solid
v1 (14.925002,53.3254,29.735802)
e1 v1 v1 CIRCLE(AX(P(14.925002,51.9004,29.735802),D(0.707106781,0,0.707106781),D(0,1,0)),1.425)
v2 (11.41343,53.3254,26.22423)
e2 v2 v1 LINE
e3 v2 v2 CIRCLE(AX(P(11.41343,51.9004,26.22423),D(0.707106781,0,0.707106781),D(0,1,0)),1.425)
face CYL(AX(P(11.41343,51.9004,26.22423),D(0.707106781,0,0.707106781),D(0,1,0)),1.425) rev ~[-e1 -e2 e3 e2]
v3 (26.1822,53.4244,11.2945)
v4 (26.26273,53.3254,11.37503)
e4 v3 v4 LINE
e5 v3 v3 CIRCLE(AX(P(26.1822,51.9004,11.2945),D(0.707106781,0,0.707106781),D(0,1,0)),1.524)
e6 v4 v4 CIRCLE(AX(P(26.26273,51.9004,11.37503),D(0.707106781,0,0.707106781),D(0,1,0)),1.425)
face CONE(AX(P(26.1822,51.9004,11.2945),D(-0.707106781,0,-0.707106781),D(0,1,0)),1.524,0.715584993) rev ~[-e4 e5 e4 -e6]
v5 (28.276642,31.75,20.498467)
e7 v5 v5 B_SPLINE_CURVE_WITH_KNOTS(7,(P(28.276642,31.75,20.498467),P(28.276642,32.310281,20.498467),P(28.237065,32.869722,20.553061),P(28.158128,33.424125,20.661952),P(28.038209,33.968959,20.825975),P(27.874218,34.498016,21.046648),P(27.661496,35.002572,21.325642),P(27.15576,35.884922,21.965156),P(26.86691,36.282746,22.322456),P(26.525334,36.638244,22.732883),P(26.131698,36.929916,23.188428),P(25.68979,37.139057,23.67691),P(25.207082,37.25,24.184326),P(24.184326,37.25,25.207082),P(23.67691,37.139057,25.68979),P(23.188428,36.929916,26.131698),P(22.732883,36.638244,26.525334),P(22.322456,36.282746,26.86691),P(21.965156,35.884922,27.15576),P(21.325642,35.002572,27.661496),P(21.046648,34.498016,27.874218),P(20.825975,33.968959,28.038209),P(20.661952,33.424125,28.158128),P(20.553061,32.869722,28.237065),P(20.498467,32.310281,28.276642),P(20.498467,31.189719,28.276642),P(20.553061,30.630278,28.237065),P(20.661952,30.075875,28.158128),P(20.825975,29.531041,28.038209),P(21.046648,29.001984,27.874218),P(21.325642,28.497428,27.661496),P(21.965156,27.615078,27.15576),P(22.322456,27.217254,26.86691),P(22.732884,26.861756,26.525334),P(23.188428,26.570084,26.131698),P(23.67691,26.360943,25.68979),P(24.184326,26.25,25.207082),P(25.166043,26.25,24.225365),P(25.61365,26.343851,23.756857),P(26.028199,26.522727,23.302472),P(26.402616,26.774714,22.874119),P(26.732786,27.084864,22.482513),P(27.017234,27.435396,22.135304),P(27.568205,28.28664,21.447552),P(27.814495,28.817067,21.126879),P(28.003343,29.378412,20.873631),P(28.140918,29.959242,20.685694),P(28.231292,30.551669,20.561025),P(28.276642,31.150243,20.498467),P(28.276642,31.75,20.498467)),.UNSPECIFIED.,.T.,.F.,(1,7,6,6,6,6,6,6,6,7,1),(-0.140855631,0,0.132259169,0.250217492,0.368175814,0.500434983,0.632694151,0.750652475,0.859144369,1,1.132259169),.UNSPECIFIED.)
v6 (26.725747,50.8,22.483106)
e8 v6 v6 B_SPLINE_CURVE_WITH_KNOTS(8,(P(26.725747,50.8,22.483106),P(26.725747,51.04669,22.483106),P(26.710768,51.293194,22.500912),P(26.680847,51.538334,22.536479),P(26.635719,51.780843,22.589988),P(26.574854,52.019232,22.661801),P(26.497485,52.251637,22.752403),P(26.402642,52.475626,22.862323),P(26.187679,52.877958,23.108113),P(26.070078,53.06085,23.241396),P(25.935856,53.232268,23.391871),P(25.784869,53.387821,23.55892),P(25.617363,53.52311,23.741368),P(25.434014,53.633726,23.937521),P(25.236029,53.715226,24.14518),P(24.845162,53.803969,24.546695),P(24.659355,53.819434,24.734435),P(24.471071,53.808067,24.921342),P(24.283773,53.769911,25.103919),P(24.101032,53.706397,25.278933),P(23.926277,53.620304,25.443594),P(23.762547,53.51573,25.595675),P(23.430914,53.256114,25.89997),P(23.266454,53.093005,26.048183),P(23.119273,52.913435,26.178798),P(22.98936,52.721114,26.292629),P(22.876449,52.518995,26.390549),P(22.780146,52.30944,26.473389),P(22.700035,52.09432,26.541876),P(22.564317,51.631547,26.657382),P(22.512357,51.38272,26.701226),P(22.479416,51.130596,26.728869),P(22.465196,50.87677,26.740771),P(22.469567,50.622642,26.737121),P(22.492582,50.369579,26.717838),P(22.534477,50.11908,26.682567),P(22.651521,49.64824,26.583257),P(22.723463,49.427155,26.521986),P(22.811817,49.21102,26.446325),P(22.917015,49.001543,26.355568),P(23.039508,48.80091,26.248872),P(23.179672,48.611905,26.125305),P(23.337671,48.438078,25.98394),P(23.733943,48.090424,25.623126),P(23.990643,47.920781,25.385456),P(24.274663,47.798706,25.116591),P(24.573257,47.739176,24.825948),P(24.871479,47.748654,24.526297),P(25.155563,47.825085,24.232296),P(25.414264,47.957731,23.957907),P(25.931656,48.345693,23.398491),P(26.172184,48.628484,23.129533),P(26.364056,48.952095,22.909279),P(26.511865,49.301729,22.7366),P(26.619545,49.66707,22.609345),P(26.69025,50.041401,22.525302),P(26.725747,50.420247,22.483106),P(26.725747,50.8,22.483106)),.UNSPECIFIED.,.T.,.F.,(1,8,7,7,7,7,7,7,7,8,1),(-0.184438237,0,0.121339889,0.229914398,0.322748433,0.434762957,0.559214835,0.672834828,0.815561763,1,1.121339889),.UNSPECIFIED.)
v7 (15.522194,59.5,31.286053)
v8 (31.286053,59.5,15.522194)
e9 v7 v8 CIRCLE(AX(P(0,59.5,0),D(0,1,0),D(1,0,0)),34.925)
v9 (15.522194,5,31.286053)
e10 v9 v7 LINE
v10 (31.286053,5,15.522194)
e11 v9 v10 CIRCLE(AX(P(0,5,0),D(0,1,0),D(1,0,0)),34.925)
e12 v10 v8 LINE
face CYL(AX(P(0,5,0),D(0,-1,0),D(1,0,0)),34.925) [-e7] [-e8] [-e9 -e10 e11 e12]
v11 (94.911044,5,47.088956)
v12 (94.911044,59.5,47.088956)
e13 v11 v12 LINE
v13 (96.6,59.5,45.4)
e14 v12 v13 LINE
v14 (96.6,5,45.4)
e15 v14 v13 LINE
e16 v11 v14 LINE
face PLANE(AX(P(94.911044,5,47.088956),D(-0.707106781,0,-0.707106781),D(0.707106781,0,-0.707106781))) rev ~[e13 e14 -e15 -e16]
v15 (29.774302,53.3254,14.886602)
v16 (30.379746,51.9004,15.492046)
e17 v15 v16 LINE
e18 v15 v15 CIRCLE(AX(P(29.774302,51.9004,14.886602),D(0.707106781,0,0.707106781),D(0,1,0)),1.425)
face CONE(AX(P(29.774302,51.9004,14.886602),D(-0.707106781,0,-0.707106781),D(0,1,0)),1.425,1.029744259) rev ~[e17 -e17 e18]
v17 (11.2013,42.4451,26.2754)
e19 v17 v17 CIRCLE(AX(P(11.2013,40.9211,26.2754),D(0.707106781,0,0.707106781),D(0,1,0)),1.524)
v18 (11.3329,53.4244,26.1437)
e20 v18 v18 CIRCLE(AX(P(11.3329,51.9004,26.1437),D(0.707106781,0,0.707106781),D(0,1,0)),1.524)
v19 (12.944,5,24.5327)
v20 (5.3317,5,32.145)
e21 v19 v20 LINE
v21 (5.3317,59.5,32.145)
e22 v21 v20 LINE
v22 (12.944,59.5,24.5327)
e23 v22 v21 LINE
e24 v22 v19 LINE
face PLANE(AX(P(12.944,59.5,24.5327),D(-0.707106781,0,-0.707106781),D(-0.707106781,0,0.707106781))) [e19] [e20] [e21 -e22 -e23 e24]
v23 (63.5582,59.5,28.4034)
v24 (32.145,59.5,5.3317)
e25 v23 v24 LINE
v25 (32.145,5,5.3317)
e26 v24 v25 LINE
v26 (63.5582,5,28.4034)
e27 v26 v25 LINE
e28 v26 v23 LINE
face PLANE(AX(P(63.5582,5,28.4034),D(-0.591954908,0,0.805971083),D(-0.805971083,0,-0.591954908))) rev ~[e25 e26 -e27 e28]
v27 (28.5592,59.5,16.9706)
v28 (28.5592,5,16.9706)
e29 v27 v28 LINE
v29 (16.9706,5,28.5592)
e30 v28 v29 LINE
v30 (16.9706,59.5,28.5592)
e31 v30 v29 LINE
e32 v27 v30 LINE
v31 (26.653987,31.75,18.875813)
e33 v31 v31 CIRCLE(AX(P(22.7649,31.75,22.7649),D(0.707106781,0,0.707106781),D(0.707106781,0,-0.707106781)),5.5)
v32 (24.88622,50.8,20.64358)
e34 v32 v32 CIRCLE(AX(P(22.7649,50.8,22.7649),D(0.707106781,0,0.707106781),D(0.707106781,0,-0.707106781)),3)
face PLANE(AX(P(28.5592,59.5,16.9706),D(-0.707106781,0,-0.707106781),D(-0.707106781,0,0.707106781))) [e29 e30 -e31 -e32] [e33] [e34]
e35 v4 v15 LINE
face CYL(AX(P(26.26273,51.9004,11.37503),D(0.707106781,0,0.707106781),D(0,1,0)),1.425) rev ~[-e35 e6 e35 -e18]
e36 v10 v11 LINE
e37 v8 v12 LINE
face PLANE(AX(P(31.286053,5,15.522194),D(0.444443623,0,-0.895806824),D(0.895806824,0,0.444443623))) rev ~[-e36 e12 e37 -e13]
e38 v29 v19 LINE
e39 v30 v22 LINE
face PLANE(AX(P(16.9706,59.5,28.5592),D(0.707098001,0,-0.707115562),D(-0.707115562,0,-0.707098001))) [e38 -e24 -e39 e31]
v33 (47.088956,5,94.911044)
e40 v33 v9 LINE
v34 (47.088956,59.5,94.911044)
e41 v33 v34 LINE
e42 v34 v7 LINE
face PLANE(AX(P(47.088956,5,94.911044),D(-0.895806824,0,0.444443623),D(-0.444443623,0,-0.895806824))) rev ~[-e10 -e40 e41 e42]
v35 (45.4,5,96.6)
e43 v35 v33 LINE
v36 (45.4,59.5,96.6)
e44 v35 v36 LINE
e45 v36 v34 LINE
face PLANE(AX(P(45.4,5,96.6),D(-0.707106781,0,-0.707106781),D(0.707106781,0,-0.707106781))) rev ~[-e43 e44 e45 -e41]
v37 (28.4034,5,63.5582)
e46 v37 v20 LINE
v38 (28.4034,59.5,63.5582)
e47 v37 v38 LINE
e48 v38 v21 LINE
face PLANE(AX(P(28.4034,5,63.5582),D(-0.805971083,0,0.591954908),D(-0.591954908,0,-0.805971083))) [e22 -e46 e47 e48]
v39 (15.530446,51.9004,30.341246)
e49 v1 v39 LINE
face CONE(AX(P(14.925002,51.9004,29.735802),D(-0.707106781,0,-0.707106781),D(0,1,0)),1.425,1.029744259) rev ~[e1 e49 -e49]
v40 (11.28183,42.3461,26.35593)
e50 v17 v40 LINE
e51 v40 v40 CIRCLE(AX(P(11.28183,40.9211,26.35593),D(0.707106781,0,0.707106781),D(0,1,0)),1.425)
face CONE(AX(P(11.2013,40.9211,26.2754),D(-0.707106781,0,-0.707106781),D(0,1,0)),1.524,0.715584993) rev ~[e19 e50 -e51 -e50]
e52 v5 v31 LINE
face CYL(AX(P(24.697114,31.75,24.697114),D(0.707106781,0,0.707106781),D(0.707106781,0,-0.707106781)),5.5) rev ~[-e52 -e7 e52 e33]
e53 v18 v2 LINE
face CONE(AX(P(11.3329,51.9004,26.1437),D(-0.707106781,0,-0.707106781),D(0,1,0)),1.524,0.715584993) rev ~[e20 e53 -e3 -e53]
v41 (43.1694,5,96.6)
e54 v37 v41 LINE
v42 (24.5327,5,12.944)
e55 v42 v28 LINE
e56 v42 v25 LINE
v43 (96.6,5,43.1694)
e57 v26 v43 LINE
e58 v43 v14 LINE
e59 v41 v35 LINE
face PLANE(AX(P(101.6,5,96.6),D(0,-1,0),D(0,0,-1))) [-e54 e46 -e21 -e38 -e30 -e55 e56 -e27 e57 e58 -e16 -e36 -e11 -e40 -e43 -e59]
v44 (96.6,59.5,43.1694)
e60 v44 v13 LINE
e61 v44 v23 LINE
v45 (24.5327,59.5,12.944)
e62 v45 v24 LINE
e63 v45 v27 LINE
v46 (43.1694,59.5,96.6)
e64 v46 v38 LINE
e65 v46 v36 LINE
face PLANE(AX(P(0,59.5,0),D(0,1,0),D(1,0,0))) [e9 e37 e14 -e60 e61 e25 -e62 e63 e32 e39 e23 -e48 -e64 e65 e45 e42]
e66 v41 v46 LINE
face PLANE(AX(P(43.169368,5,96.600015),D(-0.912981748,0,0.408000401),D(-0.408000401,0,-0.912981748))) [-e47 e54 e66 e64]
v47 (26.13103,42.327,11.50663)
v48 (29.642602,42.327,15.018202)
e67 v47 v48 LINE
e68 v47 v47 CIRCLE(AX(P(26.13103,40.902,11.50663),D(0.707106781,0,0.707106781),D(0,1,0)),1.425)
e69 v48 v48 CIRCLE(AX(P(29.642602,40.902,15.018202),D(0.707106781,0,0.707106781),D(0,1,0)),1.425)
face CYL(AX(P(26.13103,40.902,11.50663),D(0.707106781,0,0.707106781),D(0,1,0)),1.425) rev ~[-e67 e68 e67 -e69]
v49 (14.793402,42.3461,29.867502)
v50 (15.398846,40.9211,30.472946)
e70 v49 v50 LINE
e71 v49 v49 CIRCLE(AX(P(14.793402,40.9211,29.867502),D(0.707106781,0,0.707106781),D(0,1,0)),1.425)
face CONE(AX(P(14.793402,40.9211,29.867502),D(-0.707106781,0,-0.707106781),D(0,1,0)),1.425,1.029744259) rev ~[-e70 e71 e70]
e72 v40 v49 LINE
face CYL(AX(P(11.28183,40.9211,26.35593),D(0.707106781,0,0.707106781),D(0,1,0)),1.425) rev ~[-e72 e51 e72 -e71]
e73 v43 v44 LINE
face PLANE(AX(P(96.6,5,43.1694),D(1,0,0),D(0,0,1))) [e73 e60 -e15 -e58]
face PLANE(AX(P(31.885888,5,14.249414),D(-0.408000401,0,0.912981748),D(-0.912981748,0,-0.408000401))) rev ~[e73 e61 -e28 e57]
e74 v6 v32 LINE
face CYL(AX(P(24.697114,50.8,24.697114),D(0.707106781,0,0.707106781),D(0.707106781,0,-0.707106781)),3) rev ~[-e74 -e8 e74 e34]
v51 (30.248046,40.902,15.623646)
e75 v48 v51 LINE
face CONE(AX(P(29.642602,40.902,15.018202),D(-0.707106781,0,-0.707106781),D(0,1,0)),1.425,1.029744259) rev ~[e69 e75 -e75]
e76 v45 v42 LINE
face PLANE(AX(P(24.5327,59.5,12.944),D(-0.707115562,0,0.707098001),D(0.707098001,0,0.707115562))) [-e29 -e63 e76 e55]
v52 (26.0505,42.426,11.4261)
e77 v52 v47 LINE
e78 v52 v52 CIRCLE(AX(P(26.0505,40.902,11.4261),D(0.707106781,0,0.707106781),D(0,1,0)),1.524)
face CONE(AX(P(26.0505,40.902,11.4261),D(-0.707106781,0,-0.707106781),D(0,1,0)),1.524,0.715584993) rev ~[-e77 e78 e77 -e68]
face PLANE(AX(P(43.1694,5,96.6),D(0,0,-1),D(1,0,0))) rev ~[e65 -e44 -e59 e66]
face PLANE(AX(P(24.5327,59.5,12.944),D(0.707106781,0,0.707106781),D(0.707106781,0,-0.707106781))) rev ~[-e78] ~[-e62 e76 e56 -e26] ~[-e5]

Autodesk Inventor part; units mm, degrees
ref_plane "YZ Plane" through (0, 0, 0) normal (1, 0, 0) x (0, 1, 0)
ref_plane "XZ Plane" through (0, 0, 0) normal (0, 1, 0) x (-1, 0, 0)
sketch "Sketch1" plane through (0, 0, 0) normal (0, 1, 0) x (-1, 0, 0)
  line L0 (101.6, -101.6) -> (-101.6, -101.6)
  line L1 (-101.6, -101.6) -> (-101.6, 101.6)
  line L2 (-101.6, 101.6) -> (101.6, 101.6)
  line L3 (101.6, 101.6) -> (101.6, -101.6)
  line L4 (96.6, -96.6) -> (-96.6, -96.6)
  line L5 (-96.6, -96.6) -> (-96.6, 96.6)
  line L6 (-96.6, 96.6) -> (96.6, 96.6)
  line L7 (96.6, 96.6) -> (96.6, -96.6)
  line L8 (101.6, 101.6) -> (-40.4, 101.6)
  circle A0 centre (0, 0) radius 88.9
  circle A1 centre (0, 0) radius 109.3376
  line L9 (-40.4, 101.6) -> (-101.6, 40.4)
  line L10 (-45.4, 101.6) -> (-101.6, 45.4)
  line L11 (96.6, 96.6) -> (96.6, 101.6)
  line L12 (-45.4, 101.6) -> (-35.4, 101.6)
  line L13 (-35.4, 101.6) -> (-35.4, 96.6)
  line L14 (-35.4, 96.6) -> (-45.4, 96.6)
  line L15 (-45.4, 96.6) -> (-45.4, 101.6)
  line L16 (-45.4, 101.6) -> (-43.114, 101.6)
  line L17 (-43.114, 101.6) -> (-43.114, 96.6)
  line L18 (-43.114, 96.6) -> (-45.4, 96.6)
  line L19 (-45.4, 96.6) -> (-45.4, 101.6)
  line L20 (-96.6, 45.4) -> (-101.6, 45.4)
  line L21 (-101.6, 45.4) -> (-101.6, 43.114)
  line L22 (-101.6, 43.114) -> (-96.6, 43.114)
  line L23 (-96.6, 43.114) -> (-96.6, 45.4)
  point P0 (96.6, 51.2168)
  point P1 (101.6, 40.4)
  point P2 (101.6, -40.4)
  point P3 (96.6, -51.2168)
  point P4 (-96.6, 45.4)
  point P5 (-45.4, 96.6)
  dimension "d0" = 203.2
  dimension "d1" = 203.2
  dimension "d2" = 101.6
  dimension "d3" = 101.6
  dimension "d4" = 5
  dimension "d5" = 5
  dimension "d6" = 5
  dimension "d7" = 5
  dimension "d10" = 142
  dimension "d12" = 61.2
  dimension "d14" = 177.8
  dimension "d15" = 5
  dimension "d16" = 5
  dimension "d17" = 10
  dimension "d86" = 2.286
  dimension "d87" = 2.286
extrude "Extrusion1" add sketch "Sketch1" along normal blind 5 contours L0 A1 L4 L7 L3 | L0 A1 L4 | A1 L7 L3 | L0 L1 A1 L5 L4 | A1 L7 L4 | L4 A1 L5 L9 L6 L7 | A1 L7 L11 L2 L3 | L4 L5 A1 | A1 L6 L7 | L1 L9 L22 L5 A1 | L11 L6 A1 L2 | L6 L13 L2 A1 | L1 L22 A1 | A1 L22 L9 | L22 L9 L5 | L6 L17 L9 L2 L13 | L1 L20 A1 L22 | A1 L20 L9 L22 | L20 A1 L10 L5 | L5 L10 L6 L9 | A1 L17 L2 | L9 L17 A1 | L6 L9 L17 | L1 L2 L10 A1 L6 L5 | L10 A1 L20 | L10 A1 L5 | L5 A1 L6 L10 | L15 A1 L17 L9 | L6 L10 A1 L15 | L17 A1 L15 L2 | L5 L6 A1 | L6 A1 L10 | A1 L10 L15 | A0
sketch "Sketch3" plane through (0, 5, 0) normal (0, 1, 0) x (1, 0, 0)
  circle A0 centre (0, 0) radius 88.9
  line L0 (-101.6, 101.6) -> (-101.6, -101.6) projected
  line L1 (-101.6, -101.6) -> (101.6, -101.6) projected
  line L2 (-101.6, 101.6) -> (101.6, 101.6)
  line L3 (101.6, 101.6) -> (101.6, -101.6)
  line L4 (101.6, -101.6) -> (-101.6, -101.6)
  line L5 (-101.6, -101.6) -> (-101.6, 101.6)
  line L6 (-96.6, 96.6) -> (96.6, 96.6)
  line L7 (96.6, 96.6) -> (96.6, -96.6)
  line L8 (96.6, -96.6) -> (-96.6, -96.6)
  line L9 (-96.6, -96.6) -> (-96.6, 96.6)
  line L10 (-101.6, -101.6) -> (40.4, -101.6)
  circle A1 centre (0, 0) radius 109.3376
  line L11 (40.4, -101.6) -> (101.6, -40.4)
  line L12 (101.6, -101.6) -> (101.6, 101.6) projected
  line L13 (45.4038, -101.6) -> (101.6, -45.4038)
  line L14 (96.6, -45.4) -> (101.6, -45.4038)
  line L15 (45.4, -96.6) -> (45.4038, -101.6)
  line L16 (96.6, -45.4) -> (101.6, -45.4)
  line L17 (101.6, -45.4) -> (101.6, -43.114)
  line L18 (101.6, -43.114) -> (96.6, -43.114)
  line L19 (96.6, -43.114) -> (96.6, -45.4)
  line L20 (45.4038, -101.6) -> (43.1178, -101.6)
  line L21 (43.1178, -101.6) -> (43.1178, -96.6)
  line L22 (43.1178, -96.6) -> (45.4038, -96.6)
  line L23 (45.4038, -96.6) -> (45.4038, -101.6)
  point P0 (45.4038, -101.6)
  point P1 (50.4038, -96.6)
  point P2 (96.6, -50.4038)
  dimension "d28" = 177.8
  dimension "d29" = 5
  dimension "d30" = 5
  dimension "d31" = 5
  dimension "d32" = 5
  dimension "d33" = 142
  dimension "d76" = 5.0038
  dimension "d77" = 5.0038
  dimension "d88" = 2.286
  dimension "d89" = 2.286
extrude "Extrusion3" cut sketch "Sketch3" against normal blind 2 contours L2 A1 L6 L9 L0 | A1 L9 L0 | L2 A1 L6 | A1 L9 L8 L1 L0 | L2 L3 A1 L7 L6 | A1 L8 L21 L11 L1 | L3 L11 L18 L7 A1 | A1 L21 L1 | L11 L21 A1 | L3 L18 A1 | A1 L18 L11
sketch "Sketch4" plane through (0, 5, 0) normal (0, 1, 0) x (1, 0, 0)
  line L0 (101.6, 101.6) -> (-101.6, 101.6)
  line L1 (-101.6, 101.6) -> (-101.6, -101.6)
  line L2 (-101.6, -101.6) -> (101.6, -101.6)
  line L3 (101.6, -101.6) -> (101.6, 101.6)
  circle A0 centre (0, 0) radius 2.5
  line L4 (11.3314, 2.139) -> (-2.139, -11.3314)
  line L5 (0, 0) -> (-5.6569, 5.6569)
  line L6 (-5.6569, -14.8492) -> (-26.163, 5.6569)
  line L7 (-5.6569, 26.163) -> (14.8492, 5.6569)
  circle A1 centre (-5.6569, 5.6569) radius 14
  line L8 (-26.163, 5.6569) -> (-5.6569, 26.163)
  line L9 (14.8492, 5.6569) -> (-5.6569, -14.8492)
  line L10 (-40.3051, 5.6569) -> (-5.6569, 40.3051)
  line L11 (-5.6569, 40.3051) -> (28.9914, 5.6569)
  line L12 (28.9914, 5.6569) -> (-5.6569, -28.9914)
  line L13 (-5.6569, -28.9914) -> (-40.3051, 5.6569)
  line L14 (-22.6451, 9.1747) -> (-9.1747, 22.6451)
  line L15 (-9.1747, 22.6451) -> (-12.7668, 26.2372)
  line L16 (-12.7668, 26.2372) -> (-26.2372, 12.7668)
  line L17 (-26.2372, 12.7668) -> (-22.6451, 9.1747)
  point P0 (9.525, 22.5)
  point P1 (-9.525, -6.5)
  dimension "d37" = 203.2
  dimension "d38" = 203.2
  dimension "d39" = 8
  dimension "d40" = 28
  dimension "d41" = 29
  dimension "d42" = 29
  dimension "d43" = 14.5
  dimension "d44" = 10
  dimension "d45" = 10
  dimension "d46" = 10
  dimension "d47" = 10
  dimension "d48" = 5.08
  dimension "d49" = 9.525
  dimension "d50" = 9.525
  dimension "d55" = 101.6
  dimension "d56" = 101.6
extrude "Extrusion4" cut sketch "Sketch4" against normal blind 1 contours A0 | L4 L9 L6 L8 L7 | L8 L17 L16 L15 | A1 | L10 L11 L12 L13
sketch "Sketch6" plane through (0, 5, 0) normal (0, 1, 0) x (1, 0, 0)
  line L0 (45.4038, -101.6) -> (0, 0)
  line L1 (50.4038, -96.6) -> (45.4038, -101.6) projected
  line L2 (96.6, -43.114) -> (96.6, 96.6) projected
  line L3 (101.6, -101.6) -> (101.6, 101.6) projected
  circle A0 centre (0, 0) radius 34.925
  circle A1 centre (0, 0) radius 33.425
  line L4 (-101.6, 101.6) -> (-101.6, -101.6) projected
  line L5 (-101.6, -101.6) -> (40.4, -101.6)
  line L6 (-101.6, -101.6) -> (101.6, -101.6) projected
  line L7 (101.6, 101.6) -> (101.6, -43.114) projected
  line L8 (101.6, -45.4038) -> (0, 0)
  line L9 (-96.6, -96.6) -> (43.1178, -96.6) projected
  line L10 (96.6, -43.114) -> (96.6, 96.6) projected
  line L11 (43.1178, -101.6) -> (-101.6, -101.6) projected
  line L12 (101.6, -45.4038) -> (96.6, -50.4038) projected
  line L13 (45.4038, -101.6) -> (101.6, -45.4038)
  line L14 (43.1178, -101.6) -> (101.6, -101.6) projected
  line L15 (0, 0) -> (101.6, -50.4076)
  line L16 (50.4076, -101.6) -> (0, 0)
  line L17 (43.1694, -96.6) -> (47.9269, -96.6)
  line L18 (96.6, -43.1694) -> (96.6, -47.9269)
  line L19 (40.4, -101.6) -> (101.6, -40.4)
  point P0 (13.6374, -30.5164)
  point P1 (30.5164, -13.6374)
  point P2 (14.2494, -31.8859)
  point P3 (31.2861, -15.5222)
  point P4 (29.9423, -14.8555)
  point P5 (31.8859, -14.2494)
  point P6 (98.2555, -48.7483)
  point P7 (96.6, -47.9269)
  point P8 (47.9269, -96.6)
  point P9 (15.5222, -31.2861)
  point P10 (96.6, -45.4)
  point P11 (45.4, -96.6)
  point P12 (14.8555, -29.9423)
  point P13 (96.6, -45.4)
  point P14 (45.4, -96.6)
  point P15 (45.4, -96.6)
  point P16 (47.089, -94.911)
  point P17 (94.911, -47.089)
  point P18 (96.6, -45.4)
  point P19 (43.8583, -98.1417)
  point P20 (98.1417, -43.8583)
  point P21 (45.4, -96.6)
  point P22 (96.6, -45.4)
  dimension "d71" = 69.85
  dimension "d72" = 66.85
  dimension "d75" = 142
  dimension "d78" = 5.0038
  dimension "d82" = 5.0038
extrude "Extrusion6" add sketch "Sketch6" along normal blind 54.5 contours L0 A0 L16 L19 L17 | L0 A1 L16 A0 | L16 A1 L15 A0 | L15 A0 L8 L18 L19 | A0 L15 A1 L8
fillet "Fillet3" radius 12.7 1 edges at (101.6, 2.5, 101.6)
sketch "Sketch9" plane through (0, 4, 0) normal (0, 1, 0) x (1, 0, 0)
  point P0 (0, 0)
sketch "Sketch10" plane through (0, 5, 0) normal (0, 1, 0) x (1, 0, 0)
  point P0 (0, 0)
ref_plane "Work Plane1" through (24.6957, 5, 24.6957) normal (0.7071068, 0, 0.7071068) x (0.7071068, 0, -0.7071068)
sketch "Sketch15" plane through (0, 5, 0) normal (0, 1, 0) x (1, 0, 0)
  line L0 (13.6374, -30.5164) -> (43.1694, -96.6) projected
  line L1 (28.4034, -63.5582) -> (-0.6569, -23.9914)
  line L2 (28.9914, 5.6569) -> (-5.6569, -28.9914) projected
  line L3 (96.6, -43.1694) -> (30.5164, -13.6374) projected
  line L4 (-5.6569, 40.3051) -> (28.9914, 5.6569) projected
  line L5 (63.5582, -28.4034) -> (23.9914, 0.6569)
  line L6 (2.3374, -28.0682) -> (28.0682, -2.3374)
  arc A0 (13.6374, -30.5164) -> (30.5164, -13.6374) centre (0, 0) ccw projected
  line L7 (28.4034, -63.5582) -> (13.6374, -30.5164)
  line L8 (63.5582, -28.4034) -> (30.5164, -13.6374)
  arc A1 (13.6374, -30.5164) -> (30.5164, -13.6374) centre (0, 0) ccw
  dimension "d138" = 5
  dimension "d139" = 5
  dimension "d140" = 5
extrude "Extrusion11" add sketch "Sketch15" along normal up to surface (54.5 mm away) contours L0 L1 L6 L5 L3 A0
sketch "Sketch16" plane through (0, 59.5, 0) normal (0, 1, 0) x (1, 0, 0)
  line L0 (2.3374, -28.0682) -> (28.0682, -2.3374) projected
  line L1 (9.4085, -20.9971) -> (12.944, -24.5327)
  line L2 (12.944, -24.5327) -> (24.5327, -12.944)
  line L3 (24.5327, -12.944) -> (20.9971, -9.4085)
  line L4 (12.944, -24.5327) -> (24.5327, -12.944)
  line L5 (24.5327, -12.944) -> (28.5592, -16.9706)
  line L6 (28.5592, -16.9706) -> (16.9706, -28.5592)
  line L7 (16.9706, -28.5592) -> (12.944, -24.5327)
  line L8 (12.944, -24.5327) -> (5.3317, -32.145)
  line L9 (28.4034, -63.5582) -> (2.3374, -28.0682) projected
  line L10 (24.5327, -12.944) -> (32.145, -5.3317)
  line L11 (28.0682, -2.3374) -> (63.5582, -28.4034) projected
  point P0 (0, 0)
  dimension "d144" = 10
  dimension "d145" = 10
  dimension "d146" = 5
  dimension "d152" = 0
  dimension "d153" = 0
extrude "Extrusion12" cut sketch "Sketch16" against normal up to surface (54.5 mm away)
sketch "Sketch11" plane through (24.6957, 5, 24.6957) normal (0.7071068, 0, 0.7071068) x (0.7071068, 0, -0.7071068)
  line L0 (143.6841, -5) -> (0, -5) projected
  line L1 (0, -5) -> (0, 26.75)
  circle A0 centre (0, 26.75) radius 5.5
  line L2 (0, 26.75) -> (0, 45.8)
  circle A1 centre (0, 45.8) radius 3
  dimension "d120" = 31.75
  dimension "d121" = 11
  dimension "d171" = 19.05
  dimension "d172" = 6
extrude "Extrusion8" cut sketch "Sketch11" against normal blind 127
sketch "Sketch17" plane through (5.3317, 5, 32.145) normal (-0.7071068, 0, -0.7071068) x (-0.7071068, 0, 0.7071068)
  circle A0 centre (-29.4679, 45.7716) radius 1.1146
  circle A1 centre (-8.4493, 45.7716) radius 1.1245
  circle A2 centre (-8.4493, 33.2324) radius 1.229
  circle A3 centre (-29.4679, 33.2324) radius 1.2635
  line L0 (-29.4679, 45.7716) -> (-8.4493, 45.7716)
  line L1 (-8.4493, 45.7716) -> (-8.4493, 33.2324)
  line L2 (-8.4493, 33.2324) -> (-29.4679, 33.2324)
  line L3 (-29.4679, 33.2324) -> (-29.4679, 45.7716)
  line L4 (-24.4164, 38.6993) -> (-13.5188, 38.6993)
  line L5 (-13.5188, 38.6993) -> (-13.5188, 27.7864)
  line L6 (-13.5188, 27.7864) -> (-24.4164, 27.7864)
  line L7 (-24.4164, 27.7864) -> (-24.4164, 38.6993)
  line L8 (-31.5058, 47.9379) -> (-6.5058, 47.9379)
  line L9 (-6.5058, 47.9379) -> (-6.5058, 23.4716)
  line L10 (-6.5058, 23.4716) -> (-31.5058, 23.4716)
  line L11 (-31.5058, 23.4716) -> (-31.5058, 47.9379)
  line L12 (-18.9599, -5) -> (-18.9599, 33.1)
  point P0 (-29.4871, 46.9004)
  point P1 (-8.4871, 46.9004)
  point P2 (-8.3009, 35.9211)
  point P3 (-29.3009, 35.902)
  dimension "d185" = 21.0186
  dimension "d186" = 12.5392
  dimension "d187" = 2.249
  dimension "d188" = 25
  dimension "d189" = 24.4663
  dimension "d190" = 38.1
  dimension "d191" = 5.4565
  dimension "d192" = 5.4411
hole "Hole1" at (26.1822, 51.9004, 11.2945) at (26.0505, 40.902, 11.4261) at (11.3329, 51.9004, 26.1437) at (11.2013, 40.9211, 26.2754) direction (0.7071068, 0, 0.7071068) diameter 2.85 depth 5.08 tip angle 118 countersink diameter 3.048 countersink angle 82 thread size "M3.5x0.6" class "6H" standard "ANSI Metric M Profile"
sketch "Sketch18" plane through (101.6, 3, 43.114) normal (1, 0, 0) x (0, 0, -1)
  line L0 (-53.486, 2) -> (-58.486, 2) projected
  line L1 (-58.486, 2) -> (145.4353, 2)
  line L2 (145.4353, 2) -> (145.4353, -4.8825)
  line L3 (145.4353, -4.8825) -> (-58.486, -4.8825)
  line L4 (-58.486, -4.8825) -> (-58.486, 2)
  point P0 (43.114, -3)
extrude "Extrusion13" cut sketch "Sketch18" against normal through all
sketch "Sketch21" plane through (0, 59.5, 0) normal (0, 1, 0) x (1, 0, 0)
  line L0 (0, 0) -> (73.3665, -73.3665)
  line L1 (0, 0) -> (103.756, 0) construction
  dimension "d173" = 45
equation "\"d1\" = d0"
equation "\"d2\" = 0.5 * d0"
equation "\"d3\" = 0.5 * d0"
properties part number "Box_Walls_2"
